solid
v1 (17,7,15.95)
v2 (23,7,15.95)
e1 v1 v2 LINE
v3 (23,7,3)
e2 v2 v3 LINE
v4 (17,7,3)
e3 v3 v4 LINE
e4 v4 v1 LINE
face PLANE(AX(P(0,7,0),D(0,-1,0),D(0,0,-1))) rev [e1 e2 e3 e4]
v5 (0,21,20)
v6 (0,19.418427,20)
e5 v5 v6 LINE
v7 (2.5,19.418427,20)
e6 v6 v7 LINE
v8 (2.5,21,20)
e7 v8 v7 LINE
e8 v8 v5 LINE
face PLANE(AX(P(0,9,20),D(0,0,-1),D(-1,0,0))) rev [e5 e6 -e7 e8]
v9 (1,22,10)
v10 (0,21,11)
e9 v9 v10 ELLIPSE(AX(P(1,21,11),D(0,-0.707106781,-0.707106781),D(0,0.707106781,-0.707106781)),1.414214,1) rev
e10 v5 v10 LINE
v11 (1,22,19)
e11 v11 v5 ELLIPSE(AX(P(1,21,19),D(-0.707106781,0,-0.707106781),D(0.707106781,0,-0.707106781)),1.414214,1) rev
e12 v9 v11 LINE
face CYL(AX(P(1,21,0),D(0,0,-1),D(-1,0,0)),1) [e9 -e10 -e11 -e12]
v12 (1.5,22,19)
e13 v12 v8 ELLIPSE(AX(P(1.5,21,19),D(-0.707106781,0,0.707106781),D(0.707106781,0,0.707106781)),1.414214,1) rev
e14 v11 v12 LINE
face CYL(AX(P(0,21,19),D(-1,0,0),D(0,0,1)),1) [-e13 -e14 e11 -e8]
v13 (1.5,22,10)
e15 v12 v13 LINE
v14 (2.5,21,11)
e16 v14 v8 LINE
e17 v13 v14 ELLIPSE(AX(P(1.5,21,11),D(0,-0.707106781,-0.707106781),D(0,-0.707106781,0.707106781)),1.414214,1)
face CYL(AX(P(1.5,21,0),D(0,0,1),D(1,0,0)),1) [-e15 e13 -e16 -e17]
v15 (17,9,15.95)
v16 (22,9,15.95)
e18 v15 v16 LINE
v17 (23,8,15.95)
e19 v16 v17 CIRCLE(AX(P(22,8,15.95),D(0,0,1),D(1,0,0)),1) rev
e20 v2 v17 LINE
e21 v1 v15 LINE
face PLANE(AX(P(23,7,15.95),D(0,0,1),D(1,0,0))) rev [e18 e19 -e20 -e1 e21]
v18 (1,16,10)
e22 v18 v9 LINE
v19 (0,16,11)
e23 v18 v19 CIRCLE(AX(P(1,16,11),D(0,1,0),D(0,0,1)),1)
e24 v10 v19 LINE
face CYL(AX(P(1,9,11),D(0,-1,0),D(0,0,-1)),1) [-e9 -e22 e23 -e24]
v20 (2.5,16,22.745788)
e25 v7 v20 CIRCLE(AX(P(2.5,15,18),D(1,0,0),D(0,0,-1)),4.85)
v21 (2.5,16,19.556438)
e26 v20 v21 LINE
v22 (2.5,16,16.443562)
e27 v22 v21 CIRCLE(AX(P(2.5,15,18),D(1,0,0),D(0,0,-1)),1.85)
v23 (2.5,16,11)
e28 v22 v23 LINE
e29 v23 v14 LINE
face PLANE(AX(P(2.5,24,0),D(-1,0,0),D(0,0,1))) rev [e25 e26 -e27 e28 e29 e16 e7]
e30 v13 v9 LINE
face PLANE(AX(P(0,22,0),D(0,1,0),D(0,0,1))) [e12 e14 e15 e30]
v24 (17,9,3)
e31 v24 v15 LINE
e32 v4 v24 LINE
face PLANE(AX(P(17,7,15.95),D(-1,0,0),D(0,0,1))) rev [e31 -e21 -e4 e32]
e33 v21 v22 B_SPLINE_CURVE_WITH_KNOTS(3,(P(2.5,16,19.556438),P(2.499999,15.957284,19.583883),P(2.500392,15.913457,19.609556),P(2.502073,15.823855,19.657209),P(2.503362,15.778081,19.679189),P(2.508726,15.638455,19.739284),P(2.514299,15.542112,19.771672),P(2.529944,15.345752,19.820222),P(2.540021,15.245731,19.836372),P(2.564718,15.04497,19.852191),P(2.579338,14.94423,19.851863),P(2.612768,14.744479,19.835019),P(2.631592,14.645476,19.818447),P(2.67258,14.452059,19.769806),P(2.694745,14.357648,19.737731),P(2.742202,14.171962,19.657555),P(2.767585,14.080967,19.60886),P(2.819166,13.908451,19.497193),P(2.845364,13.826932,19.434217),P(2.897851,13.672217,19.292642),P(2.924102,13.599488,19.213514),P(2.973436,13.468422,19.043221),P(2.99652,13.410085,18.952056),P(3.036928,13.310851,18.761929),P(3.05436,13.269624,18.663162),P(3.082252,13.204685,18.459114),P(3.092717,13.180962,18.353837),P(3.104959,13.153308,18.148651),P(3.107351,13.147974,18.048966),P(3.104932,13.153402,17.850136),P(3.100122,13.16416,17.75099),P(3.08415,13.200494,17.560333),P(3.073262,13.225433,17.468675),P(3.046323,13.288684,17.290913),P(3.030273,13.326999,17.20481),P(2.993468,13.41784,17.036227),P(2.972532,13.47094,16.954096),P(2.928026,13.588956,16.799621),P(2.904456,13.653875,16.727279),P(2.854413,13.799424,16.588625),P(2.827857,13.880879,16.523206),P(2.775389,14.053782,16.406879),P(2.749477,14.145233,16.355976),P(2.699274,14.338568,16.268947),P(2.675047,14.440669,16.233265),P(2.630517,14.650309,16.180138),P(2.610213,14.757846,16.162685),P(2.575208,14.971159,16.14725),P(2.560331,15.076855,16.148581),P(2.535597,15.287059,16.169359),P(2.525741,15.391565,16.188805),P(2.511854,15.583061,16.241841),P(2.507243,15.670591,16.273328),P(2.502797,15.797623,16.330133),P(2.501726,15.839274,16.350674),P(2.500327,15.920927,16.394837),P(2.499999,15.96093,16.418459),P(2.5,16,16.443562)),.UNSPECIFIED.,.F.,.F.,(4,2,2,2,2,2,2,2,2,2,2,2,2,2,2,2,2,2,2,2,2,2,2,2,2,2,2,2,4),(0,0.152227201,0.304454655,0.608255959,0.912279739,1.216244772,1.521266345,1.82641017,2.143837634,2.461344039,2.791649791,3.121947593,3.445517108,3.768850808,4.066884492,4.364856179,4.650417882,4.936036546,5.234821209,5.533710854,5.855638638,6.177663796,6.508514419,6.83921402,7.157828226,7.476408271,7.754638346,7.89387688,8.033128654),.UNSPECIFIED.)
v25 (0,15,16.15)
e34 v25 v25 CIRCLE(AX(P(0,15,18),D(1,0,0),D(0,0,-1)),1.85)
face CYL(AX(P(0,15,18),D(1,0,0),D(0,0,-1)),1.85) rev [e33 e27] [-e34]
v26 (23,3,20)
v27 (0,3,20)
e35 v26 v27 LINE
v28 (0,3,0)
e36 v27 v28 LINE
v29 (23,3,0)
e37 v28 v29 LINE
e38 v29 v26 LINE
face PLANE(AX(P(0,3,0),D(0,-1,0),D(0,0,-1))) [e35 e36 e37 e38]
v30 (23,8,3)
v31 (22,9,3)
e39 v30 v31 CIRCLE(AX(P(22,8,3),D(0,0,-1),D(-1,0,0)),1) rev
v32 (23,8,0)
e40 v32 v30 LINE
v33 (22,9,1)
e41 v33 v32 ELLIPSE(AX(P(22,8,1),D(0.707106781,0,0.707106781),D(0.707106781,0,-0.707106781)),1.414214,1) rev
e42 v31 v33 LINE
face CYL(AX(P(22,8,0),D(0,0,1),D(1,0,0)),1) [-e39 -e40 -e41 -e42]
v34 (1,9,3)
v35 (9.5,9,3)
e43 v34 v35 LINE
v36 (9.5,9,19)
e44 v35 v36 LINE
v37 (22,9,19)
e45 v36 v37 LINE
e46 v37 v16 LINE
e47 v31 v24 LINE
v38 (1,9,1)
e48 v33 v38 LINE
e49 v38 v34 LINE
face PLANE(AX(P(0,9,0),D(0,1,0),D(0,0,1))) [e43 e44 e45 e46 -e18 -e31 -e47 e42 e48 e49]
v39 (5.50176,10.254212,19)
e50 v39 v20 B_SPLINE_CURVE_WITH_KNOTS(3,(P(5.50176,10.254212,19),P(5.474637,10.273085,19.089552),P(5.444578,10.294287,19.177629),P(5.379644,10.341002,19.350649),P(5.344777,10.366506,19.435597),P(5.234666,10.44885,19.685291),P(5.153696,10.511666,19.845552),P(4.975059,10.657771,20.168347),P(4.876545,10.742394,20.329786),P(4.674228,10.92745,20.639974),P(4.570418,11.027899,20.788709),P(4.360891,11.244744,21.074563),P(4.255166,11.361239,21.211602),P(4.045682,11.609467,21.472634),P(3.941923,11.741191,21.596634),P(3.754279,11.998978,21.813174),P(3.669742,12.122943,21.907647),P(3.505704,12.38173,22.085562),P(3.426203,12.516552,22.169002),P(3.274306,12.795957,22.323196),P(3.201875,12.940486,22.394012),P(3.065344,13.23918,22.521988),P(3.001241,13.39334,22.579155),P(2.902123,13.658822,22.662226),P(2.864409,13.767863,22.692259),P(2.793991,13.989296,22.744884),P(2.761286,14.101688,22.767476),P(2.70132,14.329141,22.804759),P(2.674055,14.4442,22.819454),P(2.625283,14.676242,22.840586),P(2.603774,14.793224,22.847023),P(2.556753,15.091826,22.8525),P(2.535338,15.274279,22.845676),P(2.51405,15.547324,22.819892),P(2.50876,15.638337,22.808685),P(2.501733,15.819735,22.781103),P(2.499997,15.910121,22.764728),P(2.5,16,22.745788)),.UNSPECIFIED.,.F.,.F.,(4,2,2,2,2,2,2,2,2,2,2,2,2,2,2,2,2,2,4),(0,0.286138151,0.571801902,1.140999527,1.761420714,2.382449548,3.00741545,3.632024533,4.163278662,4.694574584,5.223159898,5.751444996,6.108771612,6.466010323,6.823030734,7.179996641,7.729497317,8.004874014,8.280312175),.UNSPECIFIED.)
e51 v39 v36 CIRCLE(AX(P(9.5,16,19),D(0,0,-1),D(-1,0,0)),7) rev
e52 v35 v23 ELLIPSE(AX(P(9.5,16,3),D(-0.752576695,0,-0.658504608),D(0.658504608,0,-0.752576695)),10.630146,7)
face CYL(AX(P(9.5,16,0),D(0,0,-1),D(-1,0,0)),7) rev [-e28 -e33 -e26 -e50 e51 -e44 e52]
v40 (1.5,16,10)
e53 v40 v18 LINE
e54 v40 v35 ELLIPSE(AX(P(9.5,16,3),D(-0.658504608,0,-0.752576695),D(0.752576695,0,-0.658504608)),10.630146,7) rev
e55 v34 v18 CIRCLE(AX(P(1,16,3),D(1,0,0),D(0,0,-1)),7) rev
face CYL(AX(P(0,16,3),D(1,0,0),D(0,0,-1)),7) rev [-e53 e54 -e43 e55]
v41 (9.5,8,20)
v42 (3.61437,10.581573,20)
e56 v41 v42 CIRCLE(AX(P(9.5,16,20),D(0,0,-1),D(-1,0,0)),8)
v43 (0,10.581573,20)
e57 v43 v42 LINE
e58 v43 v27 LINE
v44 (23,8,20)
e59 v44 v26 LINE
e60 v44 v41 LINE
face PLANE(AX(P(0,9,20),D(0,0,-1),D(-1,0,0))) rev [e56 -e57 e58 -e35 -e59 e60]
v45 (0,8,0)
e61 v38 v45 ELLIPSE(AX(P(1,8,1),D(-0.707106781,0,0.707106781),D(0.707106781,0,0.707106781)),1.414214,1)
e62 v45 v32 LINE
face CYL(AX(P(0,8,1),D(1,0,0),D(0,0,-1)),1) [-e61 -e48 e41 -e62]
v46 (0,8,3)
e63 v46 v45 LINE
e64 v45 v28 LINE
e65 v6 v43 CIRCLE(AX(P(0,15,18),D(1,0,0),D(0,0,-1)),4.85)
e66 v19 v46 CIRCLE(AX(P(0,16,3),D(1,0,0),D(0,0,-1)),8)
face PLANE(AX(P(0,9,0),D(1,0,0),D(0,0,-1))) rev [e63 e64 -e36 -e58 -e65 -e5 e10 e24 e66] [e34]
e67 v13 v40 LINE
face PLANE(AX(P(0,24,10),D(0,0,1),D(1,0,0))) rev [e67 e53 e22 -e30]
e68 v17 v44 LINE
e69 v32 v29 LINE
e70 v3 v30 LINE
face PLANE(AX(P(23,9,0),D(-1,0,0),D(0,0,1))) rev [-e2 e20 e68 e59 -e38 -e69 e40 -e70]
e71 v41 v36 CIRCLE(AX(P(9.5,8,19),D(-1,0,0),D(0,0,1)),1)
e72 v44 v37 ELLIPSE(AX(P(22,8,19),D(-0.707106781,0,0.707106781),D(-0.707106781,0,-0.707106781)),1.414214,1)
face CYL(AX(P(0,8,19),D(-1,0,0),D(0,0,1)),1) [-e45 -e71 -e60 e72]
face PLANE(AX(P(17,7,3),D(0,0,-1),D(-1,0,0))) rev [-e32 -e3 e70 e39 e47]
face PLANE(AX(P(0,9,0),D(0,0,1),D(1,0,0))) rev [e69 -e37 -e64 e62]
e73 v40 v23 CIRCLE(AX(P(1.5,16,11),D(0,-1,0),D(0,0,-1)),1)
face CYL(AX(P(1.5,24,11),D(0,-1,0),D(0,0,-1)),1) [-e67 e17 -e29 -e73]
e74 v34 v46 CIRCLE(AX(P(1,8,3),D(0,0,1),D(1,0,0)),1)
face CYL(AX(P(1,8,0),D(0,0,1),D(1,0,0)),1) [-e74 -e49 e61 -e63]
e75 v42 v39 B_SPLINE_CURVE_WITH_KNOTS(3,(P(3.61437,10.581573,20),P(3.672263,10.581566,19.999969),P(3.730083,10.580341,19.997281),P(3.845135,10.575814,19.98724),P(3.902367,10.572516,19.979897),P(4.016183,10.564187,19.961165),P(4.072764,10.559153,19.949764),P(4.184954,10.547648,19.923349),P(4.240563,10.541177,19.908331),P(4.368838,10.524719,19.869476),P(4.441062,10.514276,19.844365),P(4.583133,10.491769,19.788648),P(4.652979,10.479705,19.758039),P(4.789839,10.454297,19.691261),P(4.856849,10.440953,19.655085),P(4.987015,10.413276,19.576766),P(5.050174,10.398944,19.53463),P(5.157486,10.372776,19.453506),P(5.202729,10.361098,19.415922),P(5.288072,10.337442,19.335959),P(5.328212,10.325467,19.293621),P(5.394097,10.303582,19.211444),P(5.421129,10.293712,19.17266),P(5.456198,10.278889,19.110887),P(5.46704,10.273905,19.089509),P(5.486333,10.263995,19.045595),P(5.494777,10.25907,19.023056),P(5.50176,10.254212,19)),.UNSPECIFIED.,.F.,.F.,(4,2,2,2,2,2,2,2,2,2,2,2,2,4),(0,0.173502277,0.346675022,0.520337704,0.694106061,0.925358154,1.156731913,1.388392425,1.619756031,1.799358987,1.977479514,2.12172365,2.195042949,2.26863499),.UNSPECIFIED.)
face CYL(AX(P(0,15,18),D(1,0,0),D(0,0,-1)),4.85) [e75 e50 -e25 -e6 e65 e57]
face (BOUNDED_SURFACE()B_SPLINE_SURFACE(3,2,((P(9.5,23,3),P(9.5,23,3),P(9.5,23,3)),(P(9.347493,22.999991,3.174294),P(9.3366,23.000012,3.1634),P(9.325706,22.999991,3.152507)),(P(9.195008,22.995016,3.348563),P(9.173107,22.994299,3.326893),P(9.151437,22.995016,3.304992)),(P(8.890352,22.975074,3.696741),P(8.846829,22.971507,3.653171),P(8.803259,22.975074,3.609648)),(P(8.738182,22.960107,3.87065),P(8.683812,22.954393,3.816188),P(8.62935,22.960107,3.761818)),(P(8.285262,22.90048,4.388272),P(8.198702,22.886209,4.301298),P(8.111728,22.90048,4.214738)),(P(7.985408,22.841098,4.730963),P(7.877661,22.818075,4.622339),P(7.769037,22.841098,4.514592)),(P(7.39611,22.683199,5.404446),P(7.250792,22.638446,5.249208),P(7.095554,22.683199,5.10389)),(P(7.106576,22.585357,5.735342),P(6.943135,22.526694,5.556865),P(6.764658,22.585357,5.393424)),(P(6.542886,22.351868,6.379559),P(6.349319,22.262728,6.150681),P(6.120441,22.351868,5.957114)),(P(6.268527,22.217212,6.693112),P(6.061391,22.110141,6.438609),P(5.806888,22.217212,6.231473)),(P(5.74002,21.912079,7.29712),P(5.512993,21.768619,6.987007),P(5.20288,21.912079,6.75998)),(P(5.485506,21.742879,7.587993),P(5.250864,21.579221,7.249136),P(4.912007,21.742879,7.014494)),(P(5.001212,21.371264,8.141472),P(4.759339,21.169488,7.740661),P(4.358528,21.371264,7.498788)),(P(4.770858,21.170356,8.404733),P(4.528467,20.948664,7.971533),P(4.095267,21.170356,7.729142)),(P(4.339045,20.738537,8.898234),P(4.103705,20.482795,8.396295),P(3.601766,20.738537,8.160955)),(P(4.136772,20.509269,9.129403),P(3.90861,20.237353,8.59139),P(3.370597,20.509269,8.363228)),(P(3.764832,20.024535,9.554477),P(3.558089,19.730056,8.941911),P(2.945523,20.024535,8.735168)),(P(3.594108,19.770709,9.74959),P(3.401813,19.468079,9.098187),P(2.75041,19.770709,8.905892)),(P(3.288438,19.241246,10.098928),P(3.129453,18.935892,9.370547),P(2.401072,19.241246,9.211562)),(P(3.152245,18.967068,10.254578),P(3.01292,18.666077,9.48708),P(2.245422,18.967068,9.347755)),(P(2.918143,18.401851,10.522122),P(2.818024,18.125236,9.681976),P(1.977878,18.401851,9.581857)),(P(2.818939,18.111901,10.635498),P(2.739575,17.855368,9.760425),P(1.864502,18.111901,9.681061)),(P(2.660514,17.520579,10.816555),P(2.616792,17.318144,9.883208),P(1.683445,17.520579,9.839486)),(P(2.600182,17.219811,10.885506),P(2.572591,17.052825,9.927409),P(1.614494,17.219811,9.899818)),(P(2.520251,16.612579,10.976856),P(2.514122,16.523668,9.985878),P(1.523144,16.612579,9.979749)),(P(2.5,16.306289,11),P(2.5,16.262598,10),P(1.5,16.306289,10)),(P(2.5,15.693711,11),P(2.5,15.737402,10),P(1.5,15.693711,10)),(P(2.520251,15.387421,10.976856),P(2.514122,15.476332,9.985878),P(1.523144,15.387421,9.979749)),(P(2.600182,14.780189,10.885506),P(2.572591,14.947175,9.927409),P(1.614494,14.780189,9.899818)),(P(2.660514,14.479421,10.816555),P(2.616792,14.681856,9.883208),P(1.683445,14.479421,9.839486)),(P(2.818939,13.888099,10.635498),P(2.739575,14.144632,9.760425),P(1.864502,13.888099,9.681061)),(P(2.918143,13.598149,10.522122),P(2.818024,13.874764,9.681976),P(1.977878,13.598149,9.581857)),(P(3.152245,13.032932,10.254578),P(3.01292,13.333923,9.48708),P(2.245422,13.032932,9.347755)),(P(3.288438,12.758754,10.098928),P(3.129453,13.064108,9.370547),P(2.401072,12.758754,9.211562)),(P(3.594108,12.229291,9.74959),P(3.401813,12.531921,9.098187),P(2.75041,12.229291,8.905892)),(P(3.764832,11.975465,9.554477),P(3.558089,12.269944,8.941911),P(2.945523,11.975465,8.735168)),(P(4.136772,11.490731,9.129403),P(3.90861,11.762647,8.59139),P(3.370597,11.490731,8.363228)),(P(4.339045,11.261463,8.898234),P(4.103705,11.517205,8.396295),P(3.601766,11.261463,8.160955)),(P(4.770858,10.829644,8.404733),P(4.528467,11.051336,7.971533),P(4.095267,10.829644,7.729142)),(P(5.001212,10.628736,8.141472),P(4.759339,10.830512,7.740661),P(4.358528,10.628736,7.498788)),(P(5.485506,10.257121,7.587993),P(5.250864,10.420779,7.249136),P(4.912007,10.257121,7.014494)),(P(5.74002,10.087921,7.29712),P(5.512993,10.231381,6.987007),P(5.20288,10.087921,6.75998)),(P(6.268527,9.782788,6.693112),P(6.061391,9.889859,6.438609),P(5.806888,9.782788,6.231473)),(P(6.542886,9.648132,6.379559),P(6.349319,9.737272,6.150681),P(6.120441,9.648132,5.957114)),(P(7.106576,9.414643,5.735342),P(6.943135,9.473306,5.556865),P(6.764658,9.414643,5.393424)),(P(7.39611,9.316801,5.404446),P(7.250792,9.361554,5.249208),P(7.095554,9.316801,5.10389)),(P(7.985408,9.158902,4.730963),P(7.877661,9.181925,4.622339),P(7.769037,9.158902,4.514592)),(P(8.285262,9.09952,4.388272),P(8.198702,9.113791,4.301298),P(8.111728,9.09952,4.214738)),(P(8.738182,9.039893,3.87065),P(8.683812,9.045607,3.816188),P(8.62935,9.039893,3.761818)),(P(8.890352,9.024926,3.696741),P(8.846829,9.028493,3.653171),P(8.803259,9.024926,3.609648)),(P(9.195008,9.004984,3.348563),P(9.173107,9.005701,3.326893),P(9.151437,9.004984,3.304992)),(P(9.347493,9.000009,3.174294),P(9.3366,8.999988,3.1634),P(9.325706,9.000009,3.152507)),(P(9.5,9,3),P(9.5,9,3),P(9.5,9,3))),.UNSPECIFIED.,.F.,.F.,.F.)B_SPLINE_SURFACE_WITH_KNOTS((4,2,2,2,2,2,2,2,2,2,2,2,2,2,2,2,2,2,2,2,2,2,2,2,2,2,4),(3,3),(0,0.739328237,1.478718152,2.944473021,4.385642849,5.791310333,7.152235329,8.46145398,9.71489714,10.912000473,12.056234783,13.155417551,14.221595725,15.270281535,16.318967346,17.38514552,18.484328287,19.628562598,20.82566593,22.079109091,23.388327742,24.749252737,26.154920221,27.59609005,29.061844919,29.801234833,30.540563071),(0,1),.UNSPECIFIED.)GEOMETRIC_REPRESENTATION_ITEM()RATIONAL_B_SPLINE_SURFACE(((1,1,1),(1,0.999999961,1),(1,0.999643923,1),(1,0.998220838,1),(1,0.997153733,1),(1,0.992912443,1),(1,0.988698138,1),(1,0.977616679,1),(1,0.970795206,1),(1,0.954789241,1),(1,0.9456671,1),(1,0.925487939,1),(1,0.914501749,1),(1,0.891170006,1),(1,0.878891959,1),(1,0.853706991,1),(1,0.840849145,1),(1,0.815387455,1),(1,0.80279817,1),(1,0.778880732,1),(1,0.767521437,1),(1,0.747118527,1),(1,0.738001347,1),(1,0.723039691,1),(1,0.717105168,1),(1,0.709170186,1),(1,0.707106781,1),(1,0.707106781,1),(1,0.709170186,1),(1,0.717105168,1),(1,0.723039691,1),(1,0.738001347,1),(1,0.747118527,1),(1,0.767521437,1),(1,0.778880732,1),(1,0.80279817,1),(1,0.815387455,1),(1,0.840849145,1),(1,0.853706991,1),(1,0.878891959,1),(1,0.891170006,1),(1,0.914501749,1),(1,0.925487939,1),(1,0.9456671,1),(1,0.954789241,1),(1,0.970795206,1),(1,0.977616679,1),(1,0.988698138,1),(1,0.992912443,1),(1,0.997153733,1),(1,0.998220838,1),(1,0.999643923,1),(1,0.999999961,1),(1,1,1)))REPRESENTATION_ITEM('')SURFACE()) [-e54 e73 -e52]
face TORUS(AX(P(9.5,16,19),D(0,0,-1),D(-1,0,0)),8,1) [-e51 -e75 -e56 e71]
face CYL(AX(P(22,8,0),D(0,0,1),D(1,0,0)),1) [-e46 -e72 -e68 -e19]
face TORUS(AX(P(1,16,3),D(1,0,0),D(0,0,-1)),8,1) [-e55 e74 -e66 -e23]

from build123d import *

# Parameters (mm, degrees)
CROQUIS1_W              = 23
CROQUIS1_H              = 20
SALIENTE_EXTRUIR1_DEPTH = 9
CROQUIS2_W              = 6
CROQUIS2_H              = 12.95
CORTAR_EXTRUIR1_DEPTH   = 2
CROQUIS3_W              = 2.5
CROQUIS3_H              = 20
SALIENTE_EXTRUIR3_DEPTH = 15
CROQUIS4_R              = 1.85
CORTAR_EXTRUIR4_DEPTH   = 2.5
SALIENTE_EXTRUIR7_DEPTH = 2.5
CROQUIS7_W              = 10
CROQUIS7_H              = 15
CORTAR_EXTRUIR5_DEPTH   = 2.5
CROQUIS8_W              = 23
CROQUIS8_H              = 20
CORTAR_EXTRUIR6_DEPTH   = 3
CROQUIS9_W              = 2.5
CROQUIS9_H              = 10
CORTAR_EXTRUIR7_DEPTH   = 2
REDONDEO1_R             = 7
REDONDEO2_R             = 1


with BuildPart() as part:
    # Croquis1 → Saliente-Extruir1 (new body)
    with BuildSketch(Plane(origin=(0, 0, 0), x_dir=(1, 0, 0), z_dir=(0, 1, 0))):
        with Locations((11.5, -10)):
            Rectangle(CROQUIS1_W, CROQUIS1_H)
    extrude(amount=SALIENTE_EXTRUIR1_DEPTH)

    # Croquis2 → Cortar-Extruir1 (cut)
    with BuildSketch(Plane(origin=(0, 9, 0), x_dir=(1, 0, 0), z_dir=(0, 1, 0))):
        with Locations((20, -9.475)):
            Rectangle(CROQUIS2_W, CROQUIS2_H)
    extrude(amount=-CORTAR_EXTRUIR1_DEPTH, mode=Mode.SUBTRACT)

    # Croquis3 → Saliente-Extruir3 (add)
    with BuildSketch(Plane(origin=(0, 9, 0), x_dir=(1, 0, 0), z_dir=(0, 1, 0))):
        with Locations((1.25, -10)):
            Rectangle(CROQUIS3_W, CROQUIS3_H)
    extrude(amount=SALIENTE_EXTRUIR3_DEPTH)

    # Croquis4 → Cortar-Extruir4 (cut)
    with BuildSketch(Plane(origin=(2.5, 0, 0), x_dir=(0, 0, -1), z_dir=(1, 0, 0))):
        with Locations((-18, 15)):
            Circle(CROQUIS4_R)
    extrude(amount=-CORTAR_EXTRUIR4_DEPTH, mode=Mode.SUBTRACT)

    # Croquis6 → Saliente-Extruir7 (add)
    with BuildSketch(Plane(origin=(2.5, 0, 0), x_dir=(0, 0, -1), z_dir=(1, 0, 0))):
        with BuildLine():
            Line((-20, 19.418427322), (-20, 10.581572678))
            ThreePointArc((-20, 10.581572678), (-22.85, 15), (-20, 19.418427322))
        make_face()
    extrude(amount=-SALIENTE_EXTRUIR7_DEPTH)

    # Croquis7 → Cortar-Extruir5 (cut)
    with BuildSketch(Plane(origin=(2.5, 0, 0), x_dir=(0, 0, -1), z_dir=(1, 0, 0))):
        with Locations((-5, 16.5)):
            Rectangle(CROQUIS7_W, CROQUIS7_H)
    extrude(amount=-CORTAR_EXTRUIR5_DEPTH, mode=Mode.SUBTRACT)

    # Croquis8 → Cortar-Extruir6 (cut)
    with BuildSketch(Plane.XZ):
        with Locations((11.5, 10)):
            Rectangle(CROQUIS8_W, CROQUIS8_H)
    extrude(amount=-CORTAR_EXTRUIR6_DEPTH, mode=Mode.SUBTRACT)

    # Croquis9 → Cortar-Extruir7 (cut)
    with BuildSketch(Plane(origin=(0, 24, 0), x_dir=(1, 0, 0), z_dir=(0, 1, 0))):
        with Locations((1.25, -15)):
            Rectangle(CROQUIS9_W, CROQUIS9_H)
    extrude(amount=-CORTAR_EXTRUIR7_DEPTH, mode=Mode.SUBTRACT)

    # Redondeo1
    # the kernel refuses this fillet: 7 mm, written as the material it adds along each edge
    with BuildSketch(Plane(origin=(2.5, 9, 10), x_dir=(0, 0, -1), z_dir=(-1, 0, 0))) as redondeo1_piece_1:
        with BuildLine():
            CenterArc((REDONDEO1_R, -REDONDEO1_R), REDONDEO1_R, 90, 90)
            Line((0, -REDONDEO1_R), (0, 0))
            Line((0, 0), (REDONDEO1_R, 0))
        make_face()
    extrude(amount=2.5)
    with BuildSketch(Plane(origin=(2.5, 9, 10), x_dir=(1, 0, 0), z_dir=(0, 0, 1))) as redondeo1_piece_2_section:
        with BuildLine():
            CenterArc((REDONDEO1_R, REDONDEO1_R), REDONDEO1_R, 180, 90)
            Line((0, REDONDEO1_R), (0, 0))
            Line((0, 0), (REDONDEO1_R, 0))
        make_face()
    redondeo1_piece_2 = extrude(amount=10, mode=Mode.PRIVATE)
    redondeo1_piece_2 = redondeo1_piece_2 - Plane(origin=(2.5, 15, 18), x_dir=(0, 0, -1), z_dir=(1, 0, 0)) * Cylinder(1.85, 48, mode=Mode.PRIVATE)
    add(redondeo1_piece_2)
    with BuildSketch(Plane(origin=(2.5, 9, -7.5), x_dir=(1, 0, 0), z_dir=(0, 0, 1))) as redondeo1_piece_3_section:
        with BuildLine():
            CenterArc((REDONDEO1_R, REDONDEO1_R), REDONDEO1_R, 180, 90)
            Line((0, REDONDEO1_R), (0, 0))
            Line((0, 0), (REDONDEO1_R, 0))
        make_face()
    redondeo1_piece_3 = extrude(amount=45, mode=Mode.PRIVATE)
    redondeo1_piece_3 = split(redondeo1_piece_3, bisect_by=Plane(origin=(2.5, 9, 20), z_dir=(0, 0, 1)), keep=Keep.TOP, mode=Mode.PRIVATE)
    redondeo1_piece_3 = redondeo1_piece_3 & Plane(origin=(2.5, 15, 18), x_dir=(0, -0.9110159426851695, 0.4123711340206198), z_dir=(1, 0, 0)) * Cylinder(4.85, 118, mode=Mode.PRIVATE)
    add(redondeo1_piece_3)
    with BuildSketch(Plane(origin=(2.5, 9, -7.5), x_dir=(1, 0, 0), z_dir=(0, 0, 1))) as redondeo1_piece_4a_section:
        with BuildLine():
            CenterArc((REDONDEO1_R, REDONDEO1_R), REDONDEO1_R, 180, 90)
            Line((0, REDONDEO1_R), (0, 0))
            Line((0, 0), (REDONDEO1_R, 0))
        make_face()
    redondeo1_piece_4a = extrude(amount=27.5, mode=Mode.PRIVATE)
    redondeo1_piece_4a = split(redondeo1_piece_4a, bisect_by=Plane(origin=(2.5, 9, 0), z_dir=(0, 0, 1)), keep=Keep.TOP, mode=Mode.PRIVATE)
    redondeo1_piece_4a = split(redondeo1_piece_4a, bisect_by=Plane(origin=(2.5, 9, 10), z_dir=(0, 0, -1)), keep=Keep.TOP, mode=Mode.PRIVATE)
    with BuildSketch(Plane(origin=(20, 9, 10), x_dir=(0, 0, -1), z_dir=(-1, 0, 0))) as redondeo1_piece_4b_section:
        with BuildLine():
            CenterArc((REDONDEO1_R, -REDONDEO1_R), REDONDEO1_R, 90, 90)
            Line((0, -REDONDEO1_R), (0, 0))
            Line((0, 0), (REDONDEO1_R, 0))
        make_face()
    redondeo1_piece_4b = extrude(amount=20, mode=Mode.PRIVATE)
    redondeo1_piece_4b = split(redondeo1_piece_4b, bisect_by=Plane(origin=(2.5, 9, 10), z_dir=(1, 0, 0)), keep=Keep.TOP, mode=Mode.PRIVATE)
    redondeo1_piece_4b = split(redondeo1_piece_4b, bisect_by=Plane(origin=(17, 9, 10), z_dir=(-1, 0, 0)), keep=Keep.TOP, mode=Mode.PRIVATE)
    redondeo1_piece_4 = redondeo1_piece_4a & redondeo1_piece_4b
    add(redondeo1_piece_4)

    # Redondeo2
    redondeo2_edges = [part.edges().sort_by_distance(p)[0] for p in [
        (4.977657648, 10.656927883, 7.522342352),
        (0, 19, 10),
        (0, 11.050252532, 7.949747468),
        (7.147234739, 9.40723915, 20),
        (1.25, 22, 20),
        (0, 22, 15),
        (2.5, 22, 15),
        (2.5, 19, 10),
        (23, 9, 1.5),
        (23, 9, 17.975),
        (11.5, 9, 0),
        (0, 9, 1.5),
        (16.25, 9, 20),
    ]]
    fillet(redondeo2_edges, radius=REDONDEO2_R)


solid = part.part
